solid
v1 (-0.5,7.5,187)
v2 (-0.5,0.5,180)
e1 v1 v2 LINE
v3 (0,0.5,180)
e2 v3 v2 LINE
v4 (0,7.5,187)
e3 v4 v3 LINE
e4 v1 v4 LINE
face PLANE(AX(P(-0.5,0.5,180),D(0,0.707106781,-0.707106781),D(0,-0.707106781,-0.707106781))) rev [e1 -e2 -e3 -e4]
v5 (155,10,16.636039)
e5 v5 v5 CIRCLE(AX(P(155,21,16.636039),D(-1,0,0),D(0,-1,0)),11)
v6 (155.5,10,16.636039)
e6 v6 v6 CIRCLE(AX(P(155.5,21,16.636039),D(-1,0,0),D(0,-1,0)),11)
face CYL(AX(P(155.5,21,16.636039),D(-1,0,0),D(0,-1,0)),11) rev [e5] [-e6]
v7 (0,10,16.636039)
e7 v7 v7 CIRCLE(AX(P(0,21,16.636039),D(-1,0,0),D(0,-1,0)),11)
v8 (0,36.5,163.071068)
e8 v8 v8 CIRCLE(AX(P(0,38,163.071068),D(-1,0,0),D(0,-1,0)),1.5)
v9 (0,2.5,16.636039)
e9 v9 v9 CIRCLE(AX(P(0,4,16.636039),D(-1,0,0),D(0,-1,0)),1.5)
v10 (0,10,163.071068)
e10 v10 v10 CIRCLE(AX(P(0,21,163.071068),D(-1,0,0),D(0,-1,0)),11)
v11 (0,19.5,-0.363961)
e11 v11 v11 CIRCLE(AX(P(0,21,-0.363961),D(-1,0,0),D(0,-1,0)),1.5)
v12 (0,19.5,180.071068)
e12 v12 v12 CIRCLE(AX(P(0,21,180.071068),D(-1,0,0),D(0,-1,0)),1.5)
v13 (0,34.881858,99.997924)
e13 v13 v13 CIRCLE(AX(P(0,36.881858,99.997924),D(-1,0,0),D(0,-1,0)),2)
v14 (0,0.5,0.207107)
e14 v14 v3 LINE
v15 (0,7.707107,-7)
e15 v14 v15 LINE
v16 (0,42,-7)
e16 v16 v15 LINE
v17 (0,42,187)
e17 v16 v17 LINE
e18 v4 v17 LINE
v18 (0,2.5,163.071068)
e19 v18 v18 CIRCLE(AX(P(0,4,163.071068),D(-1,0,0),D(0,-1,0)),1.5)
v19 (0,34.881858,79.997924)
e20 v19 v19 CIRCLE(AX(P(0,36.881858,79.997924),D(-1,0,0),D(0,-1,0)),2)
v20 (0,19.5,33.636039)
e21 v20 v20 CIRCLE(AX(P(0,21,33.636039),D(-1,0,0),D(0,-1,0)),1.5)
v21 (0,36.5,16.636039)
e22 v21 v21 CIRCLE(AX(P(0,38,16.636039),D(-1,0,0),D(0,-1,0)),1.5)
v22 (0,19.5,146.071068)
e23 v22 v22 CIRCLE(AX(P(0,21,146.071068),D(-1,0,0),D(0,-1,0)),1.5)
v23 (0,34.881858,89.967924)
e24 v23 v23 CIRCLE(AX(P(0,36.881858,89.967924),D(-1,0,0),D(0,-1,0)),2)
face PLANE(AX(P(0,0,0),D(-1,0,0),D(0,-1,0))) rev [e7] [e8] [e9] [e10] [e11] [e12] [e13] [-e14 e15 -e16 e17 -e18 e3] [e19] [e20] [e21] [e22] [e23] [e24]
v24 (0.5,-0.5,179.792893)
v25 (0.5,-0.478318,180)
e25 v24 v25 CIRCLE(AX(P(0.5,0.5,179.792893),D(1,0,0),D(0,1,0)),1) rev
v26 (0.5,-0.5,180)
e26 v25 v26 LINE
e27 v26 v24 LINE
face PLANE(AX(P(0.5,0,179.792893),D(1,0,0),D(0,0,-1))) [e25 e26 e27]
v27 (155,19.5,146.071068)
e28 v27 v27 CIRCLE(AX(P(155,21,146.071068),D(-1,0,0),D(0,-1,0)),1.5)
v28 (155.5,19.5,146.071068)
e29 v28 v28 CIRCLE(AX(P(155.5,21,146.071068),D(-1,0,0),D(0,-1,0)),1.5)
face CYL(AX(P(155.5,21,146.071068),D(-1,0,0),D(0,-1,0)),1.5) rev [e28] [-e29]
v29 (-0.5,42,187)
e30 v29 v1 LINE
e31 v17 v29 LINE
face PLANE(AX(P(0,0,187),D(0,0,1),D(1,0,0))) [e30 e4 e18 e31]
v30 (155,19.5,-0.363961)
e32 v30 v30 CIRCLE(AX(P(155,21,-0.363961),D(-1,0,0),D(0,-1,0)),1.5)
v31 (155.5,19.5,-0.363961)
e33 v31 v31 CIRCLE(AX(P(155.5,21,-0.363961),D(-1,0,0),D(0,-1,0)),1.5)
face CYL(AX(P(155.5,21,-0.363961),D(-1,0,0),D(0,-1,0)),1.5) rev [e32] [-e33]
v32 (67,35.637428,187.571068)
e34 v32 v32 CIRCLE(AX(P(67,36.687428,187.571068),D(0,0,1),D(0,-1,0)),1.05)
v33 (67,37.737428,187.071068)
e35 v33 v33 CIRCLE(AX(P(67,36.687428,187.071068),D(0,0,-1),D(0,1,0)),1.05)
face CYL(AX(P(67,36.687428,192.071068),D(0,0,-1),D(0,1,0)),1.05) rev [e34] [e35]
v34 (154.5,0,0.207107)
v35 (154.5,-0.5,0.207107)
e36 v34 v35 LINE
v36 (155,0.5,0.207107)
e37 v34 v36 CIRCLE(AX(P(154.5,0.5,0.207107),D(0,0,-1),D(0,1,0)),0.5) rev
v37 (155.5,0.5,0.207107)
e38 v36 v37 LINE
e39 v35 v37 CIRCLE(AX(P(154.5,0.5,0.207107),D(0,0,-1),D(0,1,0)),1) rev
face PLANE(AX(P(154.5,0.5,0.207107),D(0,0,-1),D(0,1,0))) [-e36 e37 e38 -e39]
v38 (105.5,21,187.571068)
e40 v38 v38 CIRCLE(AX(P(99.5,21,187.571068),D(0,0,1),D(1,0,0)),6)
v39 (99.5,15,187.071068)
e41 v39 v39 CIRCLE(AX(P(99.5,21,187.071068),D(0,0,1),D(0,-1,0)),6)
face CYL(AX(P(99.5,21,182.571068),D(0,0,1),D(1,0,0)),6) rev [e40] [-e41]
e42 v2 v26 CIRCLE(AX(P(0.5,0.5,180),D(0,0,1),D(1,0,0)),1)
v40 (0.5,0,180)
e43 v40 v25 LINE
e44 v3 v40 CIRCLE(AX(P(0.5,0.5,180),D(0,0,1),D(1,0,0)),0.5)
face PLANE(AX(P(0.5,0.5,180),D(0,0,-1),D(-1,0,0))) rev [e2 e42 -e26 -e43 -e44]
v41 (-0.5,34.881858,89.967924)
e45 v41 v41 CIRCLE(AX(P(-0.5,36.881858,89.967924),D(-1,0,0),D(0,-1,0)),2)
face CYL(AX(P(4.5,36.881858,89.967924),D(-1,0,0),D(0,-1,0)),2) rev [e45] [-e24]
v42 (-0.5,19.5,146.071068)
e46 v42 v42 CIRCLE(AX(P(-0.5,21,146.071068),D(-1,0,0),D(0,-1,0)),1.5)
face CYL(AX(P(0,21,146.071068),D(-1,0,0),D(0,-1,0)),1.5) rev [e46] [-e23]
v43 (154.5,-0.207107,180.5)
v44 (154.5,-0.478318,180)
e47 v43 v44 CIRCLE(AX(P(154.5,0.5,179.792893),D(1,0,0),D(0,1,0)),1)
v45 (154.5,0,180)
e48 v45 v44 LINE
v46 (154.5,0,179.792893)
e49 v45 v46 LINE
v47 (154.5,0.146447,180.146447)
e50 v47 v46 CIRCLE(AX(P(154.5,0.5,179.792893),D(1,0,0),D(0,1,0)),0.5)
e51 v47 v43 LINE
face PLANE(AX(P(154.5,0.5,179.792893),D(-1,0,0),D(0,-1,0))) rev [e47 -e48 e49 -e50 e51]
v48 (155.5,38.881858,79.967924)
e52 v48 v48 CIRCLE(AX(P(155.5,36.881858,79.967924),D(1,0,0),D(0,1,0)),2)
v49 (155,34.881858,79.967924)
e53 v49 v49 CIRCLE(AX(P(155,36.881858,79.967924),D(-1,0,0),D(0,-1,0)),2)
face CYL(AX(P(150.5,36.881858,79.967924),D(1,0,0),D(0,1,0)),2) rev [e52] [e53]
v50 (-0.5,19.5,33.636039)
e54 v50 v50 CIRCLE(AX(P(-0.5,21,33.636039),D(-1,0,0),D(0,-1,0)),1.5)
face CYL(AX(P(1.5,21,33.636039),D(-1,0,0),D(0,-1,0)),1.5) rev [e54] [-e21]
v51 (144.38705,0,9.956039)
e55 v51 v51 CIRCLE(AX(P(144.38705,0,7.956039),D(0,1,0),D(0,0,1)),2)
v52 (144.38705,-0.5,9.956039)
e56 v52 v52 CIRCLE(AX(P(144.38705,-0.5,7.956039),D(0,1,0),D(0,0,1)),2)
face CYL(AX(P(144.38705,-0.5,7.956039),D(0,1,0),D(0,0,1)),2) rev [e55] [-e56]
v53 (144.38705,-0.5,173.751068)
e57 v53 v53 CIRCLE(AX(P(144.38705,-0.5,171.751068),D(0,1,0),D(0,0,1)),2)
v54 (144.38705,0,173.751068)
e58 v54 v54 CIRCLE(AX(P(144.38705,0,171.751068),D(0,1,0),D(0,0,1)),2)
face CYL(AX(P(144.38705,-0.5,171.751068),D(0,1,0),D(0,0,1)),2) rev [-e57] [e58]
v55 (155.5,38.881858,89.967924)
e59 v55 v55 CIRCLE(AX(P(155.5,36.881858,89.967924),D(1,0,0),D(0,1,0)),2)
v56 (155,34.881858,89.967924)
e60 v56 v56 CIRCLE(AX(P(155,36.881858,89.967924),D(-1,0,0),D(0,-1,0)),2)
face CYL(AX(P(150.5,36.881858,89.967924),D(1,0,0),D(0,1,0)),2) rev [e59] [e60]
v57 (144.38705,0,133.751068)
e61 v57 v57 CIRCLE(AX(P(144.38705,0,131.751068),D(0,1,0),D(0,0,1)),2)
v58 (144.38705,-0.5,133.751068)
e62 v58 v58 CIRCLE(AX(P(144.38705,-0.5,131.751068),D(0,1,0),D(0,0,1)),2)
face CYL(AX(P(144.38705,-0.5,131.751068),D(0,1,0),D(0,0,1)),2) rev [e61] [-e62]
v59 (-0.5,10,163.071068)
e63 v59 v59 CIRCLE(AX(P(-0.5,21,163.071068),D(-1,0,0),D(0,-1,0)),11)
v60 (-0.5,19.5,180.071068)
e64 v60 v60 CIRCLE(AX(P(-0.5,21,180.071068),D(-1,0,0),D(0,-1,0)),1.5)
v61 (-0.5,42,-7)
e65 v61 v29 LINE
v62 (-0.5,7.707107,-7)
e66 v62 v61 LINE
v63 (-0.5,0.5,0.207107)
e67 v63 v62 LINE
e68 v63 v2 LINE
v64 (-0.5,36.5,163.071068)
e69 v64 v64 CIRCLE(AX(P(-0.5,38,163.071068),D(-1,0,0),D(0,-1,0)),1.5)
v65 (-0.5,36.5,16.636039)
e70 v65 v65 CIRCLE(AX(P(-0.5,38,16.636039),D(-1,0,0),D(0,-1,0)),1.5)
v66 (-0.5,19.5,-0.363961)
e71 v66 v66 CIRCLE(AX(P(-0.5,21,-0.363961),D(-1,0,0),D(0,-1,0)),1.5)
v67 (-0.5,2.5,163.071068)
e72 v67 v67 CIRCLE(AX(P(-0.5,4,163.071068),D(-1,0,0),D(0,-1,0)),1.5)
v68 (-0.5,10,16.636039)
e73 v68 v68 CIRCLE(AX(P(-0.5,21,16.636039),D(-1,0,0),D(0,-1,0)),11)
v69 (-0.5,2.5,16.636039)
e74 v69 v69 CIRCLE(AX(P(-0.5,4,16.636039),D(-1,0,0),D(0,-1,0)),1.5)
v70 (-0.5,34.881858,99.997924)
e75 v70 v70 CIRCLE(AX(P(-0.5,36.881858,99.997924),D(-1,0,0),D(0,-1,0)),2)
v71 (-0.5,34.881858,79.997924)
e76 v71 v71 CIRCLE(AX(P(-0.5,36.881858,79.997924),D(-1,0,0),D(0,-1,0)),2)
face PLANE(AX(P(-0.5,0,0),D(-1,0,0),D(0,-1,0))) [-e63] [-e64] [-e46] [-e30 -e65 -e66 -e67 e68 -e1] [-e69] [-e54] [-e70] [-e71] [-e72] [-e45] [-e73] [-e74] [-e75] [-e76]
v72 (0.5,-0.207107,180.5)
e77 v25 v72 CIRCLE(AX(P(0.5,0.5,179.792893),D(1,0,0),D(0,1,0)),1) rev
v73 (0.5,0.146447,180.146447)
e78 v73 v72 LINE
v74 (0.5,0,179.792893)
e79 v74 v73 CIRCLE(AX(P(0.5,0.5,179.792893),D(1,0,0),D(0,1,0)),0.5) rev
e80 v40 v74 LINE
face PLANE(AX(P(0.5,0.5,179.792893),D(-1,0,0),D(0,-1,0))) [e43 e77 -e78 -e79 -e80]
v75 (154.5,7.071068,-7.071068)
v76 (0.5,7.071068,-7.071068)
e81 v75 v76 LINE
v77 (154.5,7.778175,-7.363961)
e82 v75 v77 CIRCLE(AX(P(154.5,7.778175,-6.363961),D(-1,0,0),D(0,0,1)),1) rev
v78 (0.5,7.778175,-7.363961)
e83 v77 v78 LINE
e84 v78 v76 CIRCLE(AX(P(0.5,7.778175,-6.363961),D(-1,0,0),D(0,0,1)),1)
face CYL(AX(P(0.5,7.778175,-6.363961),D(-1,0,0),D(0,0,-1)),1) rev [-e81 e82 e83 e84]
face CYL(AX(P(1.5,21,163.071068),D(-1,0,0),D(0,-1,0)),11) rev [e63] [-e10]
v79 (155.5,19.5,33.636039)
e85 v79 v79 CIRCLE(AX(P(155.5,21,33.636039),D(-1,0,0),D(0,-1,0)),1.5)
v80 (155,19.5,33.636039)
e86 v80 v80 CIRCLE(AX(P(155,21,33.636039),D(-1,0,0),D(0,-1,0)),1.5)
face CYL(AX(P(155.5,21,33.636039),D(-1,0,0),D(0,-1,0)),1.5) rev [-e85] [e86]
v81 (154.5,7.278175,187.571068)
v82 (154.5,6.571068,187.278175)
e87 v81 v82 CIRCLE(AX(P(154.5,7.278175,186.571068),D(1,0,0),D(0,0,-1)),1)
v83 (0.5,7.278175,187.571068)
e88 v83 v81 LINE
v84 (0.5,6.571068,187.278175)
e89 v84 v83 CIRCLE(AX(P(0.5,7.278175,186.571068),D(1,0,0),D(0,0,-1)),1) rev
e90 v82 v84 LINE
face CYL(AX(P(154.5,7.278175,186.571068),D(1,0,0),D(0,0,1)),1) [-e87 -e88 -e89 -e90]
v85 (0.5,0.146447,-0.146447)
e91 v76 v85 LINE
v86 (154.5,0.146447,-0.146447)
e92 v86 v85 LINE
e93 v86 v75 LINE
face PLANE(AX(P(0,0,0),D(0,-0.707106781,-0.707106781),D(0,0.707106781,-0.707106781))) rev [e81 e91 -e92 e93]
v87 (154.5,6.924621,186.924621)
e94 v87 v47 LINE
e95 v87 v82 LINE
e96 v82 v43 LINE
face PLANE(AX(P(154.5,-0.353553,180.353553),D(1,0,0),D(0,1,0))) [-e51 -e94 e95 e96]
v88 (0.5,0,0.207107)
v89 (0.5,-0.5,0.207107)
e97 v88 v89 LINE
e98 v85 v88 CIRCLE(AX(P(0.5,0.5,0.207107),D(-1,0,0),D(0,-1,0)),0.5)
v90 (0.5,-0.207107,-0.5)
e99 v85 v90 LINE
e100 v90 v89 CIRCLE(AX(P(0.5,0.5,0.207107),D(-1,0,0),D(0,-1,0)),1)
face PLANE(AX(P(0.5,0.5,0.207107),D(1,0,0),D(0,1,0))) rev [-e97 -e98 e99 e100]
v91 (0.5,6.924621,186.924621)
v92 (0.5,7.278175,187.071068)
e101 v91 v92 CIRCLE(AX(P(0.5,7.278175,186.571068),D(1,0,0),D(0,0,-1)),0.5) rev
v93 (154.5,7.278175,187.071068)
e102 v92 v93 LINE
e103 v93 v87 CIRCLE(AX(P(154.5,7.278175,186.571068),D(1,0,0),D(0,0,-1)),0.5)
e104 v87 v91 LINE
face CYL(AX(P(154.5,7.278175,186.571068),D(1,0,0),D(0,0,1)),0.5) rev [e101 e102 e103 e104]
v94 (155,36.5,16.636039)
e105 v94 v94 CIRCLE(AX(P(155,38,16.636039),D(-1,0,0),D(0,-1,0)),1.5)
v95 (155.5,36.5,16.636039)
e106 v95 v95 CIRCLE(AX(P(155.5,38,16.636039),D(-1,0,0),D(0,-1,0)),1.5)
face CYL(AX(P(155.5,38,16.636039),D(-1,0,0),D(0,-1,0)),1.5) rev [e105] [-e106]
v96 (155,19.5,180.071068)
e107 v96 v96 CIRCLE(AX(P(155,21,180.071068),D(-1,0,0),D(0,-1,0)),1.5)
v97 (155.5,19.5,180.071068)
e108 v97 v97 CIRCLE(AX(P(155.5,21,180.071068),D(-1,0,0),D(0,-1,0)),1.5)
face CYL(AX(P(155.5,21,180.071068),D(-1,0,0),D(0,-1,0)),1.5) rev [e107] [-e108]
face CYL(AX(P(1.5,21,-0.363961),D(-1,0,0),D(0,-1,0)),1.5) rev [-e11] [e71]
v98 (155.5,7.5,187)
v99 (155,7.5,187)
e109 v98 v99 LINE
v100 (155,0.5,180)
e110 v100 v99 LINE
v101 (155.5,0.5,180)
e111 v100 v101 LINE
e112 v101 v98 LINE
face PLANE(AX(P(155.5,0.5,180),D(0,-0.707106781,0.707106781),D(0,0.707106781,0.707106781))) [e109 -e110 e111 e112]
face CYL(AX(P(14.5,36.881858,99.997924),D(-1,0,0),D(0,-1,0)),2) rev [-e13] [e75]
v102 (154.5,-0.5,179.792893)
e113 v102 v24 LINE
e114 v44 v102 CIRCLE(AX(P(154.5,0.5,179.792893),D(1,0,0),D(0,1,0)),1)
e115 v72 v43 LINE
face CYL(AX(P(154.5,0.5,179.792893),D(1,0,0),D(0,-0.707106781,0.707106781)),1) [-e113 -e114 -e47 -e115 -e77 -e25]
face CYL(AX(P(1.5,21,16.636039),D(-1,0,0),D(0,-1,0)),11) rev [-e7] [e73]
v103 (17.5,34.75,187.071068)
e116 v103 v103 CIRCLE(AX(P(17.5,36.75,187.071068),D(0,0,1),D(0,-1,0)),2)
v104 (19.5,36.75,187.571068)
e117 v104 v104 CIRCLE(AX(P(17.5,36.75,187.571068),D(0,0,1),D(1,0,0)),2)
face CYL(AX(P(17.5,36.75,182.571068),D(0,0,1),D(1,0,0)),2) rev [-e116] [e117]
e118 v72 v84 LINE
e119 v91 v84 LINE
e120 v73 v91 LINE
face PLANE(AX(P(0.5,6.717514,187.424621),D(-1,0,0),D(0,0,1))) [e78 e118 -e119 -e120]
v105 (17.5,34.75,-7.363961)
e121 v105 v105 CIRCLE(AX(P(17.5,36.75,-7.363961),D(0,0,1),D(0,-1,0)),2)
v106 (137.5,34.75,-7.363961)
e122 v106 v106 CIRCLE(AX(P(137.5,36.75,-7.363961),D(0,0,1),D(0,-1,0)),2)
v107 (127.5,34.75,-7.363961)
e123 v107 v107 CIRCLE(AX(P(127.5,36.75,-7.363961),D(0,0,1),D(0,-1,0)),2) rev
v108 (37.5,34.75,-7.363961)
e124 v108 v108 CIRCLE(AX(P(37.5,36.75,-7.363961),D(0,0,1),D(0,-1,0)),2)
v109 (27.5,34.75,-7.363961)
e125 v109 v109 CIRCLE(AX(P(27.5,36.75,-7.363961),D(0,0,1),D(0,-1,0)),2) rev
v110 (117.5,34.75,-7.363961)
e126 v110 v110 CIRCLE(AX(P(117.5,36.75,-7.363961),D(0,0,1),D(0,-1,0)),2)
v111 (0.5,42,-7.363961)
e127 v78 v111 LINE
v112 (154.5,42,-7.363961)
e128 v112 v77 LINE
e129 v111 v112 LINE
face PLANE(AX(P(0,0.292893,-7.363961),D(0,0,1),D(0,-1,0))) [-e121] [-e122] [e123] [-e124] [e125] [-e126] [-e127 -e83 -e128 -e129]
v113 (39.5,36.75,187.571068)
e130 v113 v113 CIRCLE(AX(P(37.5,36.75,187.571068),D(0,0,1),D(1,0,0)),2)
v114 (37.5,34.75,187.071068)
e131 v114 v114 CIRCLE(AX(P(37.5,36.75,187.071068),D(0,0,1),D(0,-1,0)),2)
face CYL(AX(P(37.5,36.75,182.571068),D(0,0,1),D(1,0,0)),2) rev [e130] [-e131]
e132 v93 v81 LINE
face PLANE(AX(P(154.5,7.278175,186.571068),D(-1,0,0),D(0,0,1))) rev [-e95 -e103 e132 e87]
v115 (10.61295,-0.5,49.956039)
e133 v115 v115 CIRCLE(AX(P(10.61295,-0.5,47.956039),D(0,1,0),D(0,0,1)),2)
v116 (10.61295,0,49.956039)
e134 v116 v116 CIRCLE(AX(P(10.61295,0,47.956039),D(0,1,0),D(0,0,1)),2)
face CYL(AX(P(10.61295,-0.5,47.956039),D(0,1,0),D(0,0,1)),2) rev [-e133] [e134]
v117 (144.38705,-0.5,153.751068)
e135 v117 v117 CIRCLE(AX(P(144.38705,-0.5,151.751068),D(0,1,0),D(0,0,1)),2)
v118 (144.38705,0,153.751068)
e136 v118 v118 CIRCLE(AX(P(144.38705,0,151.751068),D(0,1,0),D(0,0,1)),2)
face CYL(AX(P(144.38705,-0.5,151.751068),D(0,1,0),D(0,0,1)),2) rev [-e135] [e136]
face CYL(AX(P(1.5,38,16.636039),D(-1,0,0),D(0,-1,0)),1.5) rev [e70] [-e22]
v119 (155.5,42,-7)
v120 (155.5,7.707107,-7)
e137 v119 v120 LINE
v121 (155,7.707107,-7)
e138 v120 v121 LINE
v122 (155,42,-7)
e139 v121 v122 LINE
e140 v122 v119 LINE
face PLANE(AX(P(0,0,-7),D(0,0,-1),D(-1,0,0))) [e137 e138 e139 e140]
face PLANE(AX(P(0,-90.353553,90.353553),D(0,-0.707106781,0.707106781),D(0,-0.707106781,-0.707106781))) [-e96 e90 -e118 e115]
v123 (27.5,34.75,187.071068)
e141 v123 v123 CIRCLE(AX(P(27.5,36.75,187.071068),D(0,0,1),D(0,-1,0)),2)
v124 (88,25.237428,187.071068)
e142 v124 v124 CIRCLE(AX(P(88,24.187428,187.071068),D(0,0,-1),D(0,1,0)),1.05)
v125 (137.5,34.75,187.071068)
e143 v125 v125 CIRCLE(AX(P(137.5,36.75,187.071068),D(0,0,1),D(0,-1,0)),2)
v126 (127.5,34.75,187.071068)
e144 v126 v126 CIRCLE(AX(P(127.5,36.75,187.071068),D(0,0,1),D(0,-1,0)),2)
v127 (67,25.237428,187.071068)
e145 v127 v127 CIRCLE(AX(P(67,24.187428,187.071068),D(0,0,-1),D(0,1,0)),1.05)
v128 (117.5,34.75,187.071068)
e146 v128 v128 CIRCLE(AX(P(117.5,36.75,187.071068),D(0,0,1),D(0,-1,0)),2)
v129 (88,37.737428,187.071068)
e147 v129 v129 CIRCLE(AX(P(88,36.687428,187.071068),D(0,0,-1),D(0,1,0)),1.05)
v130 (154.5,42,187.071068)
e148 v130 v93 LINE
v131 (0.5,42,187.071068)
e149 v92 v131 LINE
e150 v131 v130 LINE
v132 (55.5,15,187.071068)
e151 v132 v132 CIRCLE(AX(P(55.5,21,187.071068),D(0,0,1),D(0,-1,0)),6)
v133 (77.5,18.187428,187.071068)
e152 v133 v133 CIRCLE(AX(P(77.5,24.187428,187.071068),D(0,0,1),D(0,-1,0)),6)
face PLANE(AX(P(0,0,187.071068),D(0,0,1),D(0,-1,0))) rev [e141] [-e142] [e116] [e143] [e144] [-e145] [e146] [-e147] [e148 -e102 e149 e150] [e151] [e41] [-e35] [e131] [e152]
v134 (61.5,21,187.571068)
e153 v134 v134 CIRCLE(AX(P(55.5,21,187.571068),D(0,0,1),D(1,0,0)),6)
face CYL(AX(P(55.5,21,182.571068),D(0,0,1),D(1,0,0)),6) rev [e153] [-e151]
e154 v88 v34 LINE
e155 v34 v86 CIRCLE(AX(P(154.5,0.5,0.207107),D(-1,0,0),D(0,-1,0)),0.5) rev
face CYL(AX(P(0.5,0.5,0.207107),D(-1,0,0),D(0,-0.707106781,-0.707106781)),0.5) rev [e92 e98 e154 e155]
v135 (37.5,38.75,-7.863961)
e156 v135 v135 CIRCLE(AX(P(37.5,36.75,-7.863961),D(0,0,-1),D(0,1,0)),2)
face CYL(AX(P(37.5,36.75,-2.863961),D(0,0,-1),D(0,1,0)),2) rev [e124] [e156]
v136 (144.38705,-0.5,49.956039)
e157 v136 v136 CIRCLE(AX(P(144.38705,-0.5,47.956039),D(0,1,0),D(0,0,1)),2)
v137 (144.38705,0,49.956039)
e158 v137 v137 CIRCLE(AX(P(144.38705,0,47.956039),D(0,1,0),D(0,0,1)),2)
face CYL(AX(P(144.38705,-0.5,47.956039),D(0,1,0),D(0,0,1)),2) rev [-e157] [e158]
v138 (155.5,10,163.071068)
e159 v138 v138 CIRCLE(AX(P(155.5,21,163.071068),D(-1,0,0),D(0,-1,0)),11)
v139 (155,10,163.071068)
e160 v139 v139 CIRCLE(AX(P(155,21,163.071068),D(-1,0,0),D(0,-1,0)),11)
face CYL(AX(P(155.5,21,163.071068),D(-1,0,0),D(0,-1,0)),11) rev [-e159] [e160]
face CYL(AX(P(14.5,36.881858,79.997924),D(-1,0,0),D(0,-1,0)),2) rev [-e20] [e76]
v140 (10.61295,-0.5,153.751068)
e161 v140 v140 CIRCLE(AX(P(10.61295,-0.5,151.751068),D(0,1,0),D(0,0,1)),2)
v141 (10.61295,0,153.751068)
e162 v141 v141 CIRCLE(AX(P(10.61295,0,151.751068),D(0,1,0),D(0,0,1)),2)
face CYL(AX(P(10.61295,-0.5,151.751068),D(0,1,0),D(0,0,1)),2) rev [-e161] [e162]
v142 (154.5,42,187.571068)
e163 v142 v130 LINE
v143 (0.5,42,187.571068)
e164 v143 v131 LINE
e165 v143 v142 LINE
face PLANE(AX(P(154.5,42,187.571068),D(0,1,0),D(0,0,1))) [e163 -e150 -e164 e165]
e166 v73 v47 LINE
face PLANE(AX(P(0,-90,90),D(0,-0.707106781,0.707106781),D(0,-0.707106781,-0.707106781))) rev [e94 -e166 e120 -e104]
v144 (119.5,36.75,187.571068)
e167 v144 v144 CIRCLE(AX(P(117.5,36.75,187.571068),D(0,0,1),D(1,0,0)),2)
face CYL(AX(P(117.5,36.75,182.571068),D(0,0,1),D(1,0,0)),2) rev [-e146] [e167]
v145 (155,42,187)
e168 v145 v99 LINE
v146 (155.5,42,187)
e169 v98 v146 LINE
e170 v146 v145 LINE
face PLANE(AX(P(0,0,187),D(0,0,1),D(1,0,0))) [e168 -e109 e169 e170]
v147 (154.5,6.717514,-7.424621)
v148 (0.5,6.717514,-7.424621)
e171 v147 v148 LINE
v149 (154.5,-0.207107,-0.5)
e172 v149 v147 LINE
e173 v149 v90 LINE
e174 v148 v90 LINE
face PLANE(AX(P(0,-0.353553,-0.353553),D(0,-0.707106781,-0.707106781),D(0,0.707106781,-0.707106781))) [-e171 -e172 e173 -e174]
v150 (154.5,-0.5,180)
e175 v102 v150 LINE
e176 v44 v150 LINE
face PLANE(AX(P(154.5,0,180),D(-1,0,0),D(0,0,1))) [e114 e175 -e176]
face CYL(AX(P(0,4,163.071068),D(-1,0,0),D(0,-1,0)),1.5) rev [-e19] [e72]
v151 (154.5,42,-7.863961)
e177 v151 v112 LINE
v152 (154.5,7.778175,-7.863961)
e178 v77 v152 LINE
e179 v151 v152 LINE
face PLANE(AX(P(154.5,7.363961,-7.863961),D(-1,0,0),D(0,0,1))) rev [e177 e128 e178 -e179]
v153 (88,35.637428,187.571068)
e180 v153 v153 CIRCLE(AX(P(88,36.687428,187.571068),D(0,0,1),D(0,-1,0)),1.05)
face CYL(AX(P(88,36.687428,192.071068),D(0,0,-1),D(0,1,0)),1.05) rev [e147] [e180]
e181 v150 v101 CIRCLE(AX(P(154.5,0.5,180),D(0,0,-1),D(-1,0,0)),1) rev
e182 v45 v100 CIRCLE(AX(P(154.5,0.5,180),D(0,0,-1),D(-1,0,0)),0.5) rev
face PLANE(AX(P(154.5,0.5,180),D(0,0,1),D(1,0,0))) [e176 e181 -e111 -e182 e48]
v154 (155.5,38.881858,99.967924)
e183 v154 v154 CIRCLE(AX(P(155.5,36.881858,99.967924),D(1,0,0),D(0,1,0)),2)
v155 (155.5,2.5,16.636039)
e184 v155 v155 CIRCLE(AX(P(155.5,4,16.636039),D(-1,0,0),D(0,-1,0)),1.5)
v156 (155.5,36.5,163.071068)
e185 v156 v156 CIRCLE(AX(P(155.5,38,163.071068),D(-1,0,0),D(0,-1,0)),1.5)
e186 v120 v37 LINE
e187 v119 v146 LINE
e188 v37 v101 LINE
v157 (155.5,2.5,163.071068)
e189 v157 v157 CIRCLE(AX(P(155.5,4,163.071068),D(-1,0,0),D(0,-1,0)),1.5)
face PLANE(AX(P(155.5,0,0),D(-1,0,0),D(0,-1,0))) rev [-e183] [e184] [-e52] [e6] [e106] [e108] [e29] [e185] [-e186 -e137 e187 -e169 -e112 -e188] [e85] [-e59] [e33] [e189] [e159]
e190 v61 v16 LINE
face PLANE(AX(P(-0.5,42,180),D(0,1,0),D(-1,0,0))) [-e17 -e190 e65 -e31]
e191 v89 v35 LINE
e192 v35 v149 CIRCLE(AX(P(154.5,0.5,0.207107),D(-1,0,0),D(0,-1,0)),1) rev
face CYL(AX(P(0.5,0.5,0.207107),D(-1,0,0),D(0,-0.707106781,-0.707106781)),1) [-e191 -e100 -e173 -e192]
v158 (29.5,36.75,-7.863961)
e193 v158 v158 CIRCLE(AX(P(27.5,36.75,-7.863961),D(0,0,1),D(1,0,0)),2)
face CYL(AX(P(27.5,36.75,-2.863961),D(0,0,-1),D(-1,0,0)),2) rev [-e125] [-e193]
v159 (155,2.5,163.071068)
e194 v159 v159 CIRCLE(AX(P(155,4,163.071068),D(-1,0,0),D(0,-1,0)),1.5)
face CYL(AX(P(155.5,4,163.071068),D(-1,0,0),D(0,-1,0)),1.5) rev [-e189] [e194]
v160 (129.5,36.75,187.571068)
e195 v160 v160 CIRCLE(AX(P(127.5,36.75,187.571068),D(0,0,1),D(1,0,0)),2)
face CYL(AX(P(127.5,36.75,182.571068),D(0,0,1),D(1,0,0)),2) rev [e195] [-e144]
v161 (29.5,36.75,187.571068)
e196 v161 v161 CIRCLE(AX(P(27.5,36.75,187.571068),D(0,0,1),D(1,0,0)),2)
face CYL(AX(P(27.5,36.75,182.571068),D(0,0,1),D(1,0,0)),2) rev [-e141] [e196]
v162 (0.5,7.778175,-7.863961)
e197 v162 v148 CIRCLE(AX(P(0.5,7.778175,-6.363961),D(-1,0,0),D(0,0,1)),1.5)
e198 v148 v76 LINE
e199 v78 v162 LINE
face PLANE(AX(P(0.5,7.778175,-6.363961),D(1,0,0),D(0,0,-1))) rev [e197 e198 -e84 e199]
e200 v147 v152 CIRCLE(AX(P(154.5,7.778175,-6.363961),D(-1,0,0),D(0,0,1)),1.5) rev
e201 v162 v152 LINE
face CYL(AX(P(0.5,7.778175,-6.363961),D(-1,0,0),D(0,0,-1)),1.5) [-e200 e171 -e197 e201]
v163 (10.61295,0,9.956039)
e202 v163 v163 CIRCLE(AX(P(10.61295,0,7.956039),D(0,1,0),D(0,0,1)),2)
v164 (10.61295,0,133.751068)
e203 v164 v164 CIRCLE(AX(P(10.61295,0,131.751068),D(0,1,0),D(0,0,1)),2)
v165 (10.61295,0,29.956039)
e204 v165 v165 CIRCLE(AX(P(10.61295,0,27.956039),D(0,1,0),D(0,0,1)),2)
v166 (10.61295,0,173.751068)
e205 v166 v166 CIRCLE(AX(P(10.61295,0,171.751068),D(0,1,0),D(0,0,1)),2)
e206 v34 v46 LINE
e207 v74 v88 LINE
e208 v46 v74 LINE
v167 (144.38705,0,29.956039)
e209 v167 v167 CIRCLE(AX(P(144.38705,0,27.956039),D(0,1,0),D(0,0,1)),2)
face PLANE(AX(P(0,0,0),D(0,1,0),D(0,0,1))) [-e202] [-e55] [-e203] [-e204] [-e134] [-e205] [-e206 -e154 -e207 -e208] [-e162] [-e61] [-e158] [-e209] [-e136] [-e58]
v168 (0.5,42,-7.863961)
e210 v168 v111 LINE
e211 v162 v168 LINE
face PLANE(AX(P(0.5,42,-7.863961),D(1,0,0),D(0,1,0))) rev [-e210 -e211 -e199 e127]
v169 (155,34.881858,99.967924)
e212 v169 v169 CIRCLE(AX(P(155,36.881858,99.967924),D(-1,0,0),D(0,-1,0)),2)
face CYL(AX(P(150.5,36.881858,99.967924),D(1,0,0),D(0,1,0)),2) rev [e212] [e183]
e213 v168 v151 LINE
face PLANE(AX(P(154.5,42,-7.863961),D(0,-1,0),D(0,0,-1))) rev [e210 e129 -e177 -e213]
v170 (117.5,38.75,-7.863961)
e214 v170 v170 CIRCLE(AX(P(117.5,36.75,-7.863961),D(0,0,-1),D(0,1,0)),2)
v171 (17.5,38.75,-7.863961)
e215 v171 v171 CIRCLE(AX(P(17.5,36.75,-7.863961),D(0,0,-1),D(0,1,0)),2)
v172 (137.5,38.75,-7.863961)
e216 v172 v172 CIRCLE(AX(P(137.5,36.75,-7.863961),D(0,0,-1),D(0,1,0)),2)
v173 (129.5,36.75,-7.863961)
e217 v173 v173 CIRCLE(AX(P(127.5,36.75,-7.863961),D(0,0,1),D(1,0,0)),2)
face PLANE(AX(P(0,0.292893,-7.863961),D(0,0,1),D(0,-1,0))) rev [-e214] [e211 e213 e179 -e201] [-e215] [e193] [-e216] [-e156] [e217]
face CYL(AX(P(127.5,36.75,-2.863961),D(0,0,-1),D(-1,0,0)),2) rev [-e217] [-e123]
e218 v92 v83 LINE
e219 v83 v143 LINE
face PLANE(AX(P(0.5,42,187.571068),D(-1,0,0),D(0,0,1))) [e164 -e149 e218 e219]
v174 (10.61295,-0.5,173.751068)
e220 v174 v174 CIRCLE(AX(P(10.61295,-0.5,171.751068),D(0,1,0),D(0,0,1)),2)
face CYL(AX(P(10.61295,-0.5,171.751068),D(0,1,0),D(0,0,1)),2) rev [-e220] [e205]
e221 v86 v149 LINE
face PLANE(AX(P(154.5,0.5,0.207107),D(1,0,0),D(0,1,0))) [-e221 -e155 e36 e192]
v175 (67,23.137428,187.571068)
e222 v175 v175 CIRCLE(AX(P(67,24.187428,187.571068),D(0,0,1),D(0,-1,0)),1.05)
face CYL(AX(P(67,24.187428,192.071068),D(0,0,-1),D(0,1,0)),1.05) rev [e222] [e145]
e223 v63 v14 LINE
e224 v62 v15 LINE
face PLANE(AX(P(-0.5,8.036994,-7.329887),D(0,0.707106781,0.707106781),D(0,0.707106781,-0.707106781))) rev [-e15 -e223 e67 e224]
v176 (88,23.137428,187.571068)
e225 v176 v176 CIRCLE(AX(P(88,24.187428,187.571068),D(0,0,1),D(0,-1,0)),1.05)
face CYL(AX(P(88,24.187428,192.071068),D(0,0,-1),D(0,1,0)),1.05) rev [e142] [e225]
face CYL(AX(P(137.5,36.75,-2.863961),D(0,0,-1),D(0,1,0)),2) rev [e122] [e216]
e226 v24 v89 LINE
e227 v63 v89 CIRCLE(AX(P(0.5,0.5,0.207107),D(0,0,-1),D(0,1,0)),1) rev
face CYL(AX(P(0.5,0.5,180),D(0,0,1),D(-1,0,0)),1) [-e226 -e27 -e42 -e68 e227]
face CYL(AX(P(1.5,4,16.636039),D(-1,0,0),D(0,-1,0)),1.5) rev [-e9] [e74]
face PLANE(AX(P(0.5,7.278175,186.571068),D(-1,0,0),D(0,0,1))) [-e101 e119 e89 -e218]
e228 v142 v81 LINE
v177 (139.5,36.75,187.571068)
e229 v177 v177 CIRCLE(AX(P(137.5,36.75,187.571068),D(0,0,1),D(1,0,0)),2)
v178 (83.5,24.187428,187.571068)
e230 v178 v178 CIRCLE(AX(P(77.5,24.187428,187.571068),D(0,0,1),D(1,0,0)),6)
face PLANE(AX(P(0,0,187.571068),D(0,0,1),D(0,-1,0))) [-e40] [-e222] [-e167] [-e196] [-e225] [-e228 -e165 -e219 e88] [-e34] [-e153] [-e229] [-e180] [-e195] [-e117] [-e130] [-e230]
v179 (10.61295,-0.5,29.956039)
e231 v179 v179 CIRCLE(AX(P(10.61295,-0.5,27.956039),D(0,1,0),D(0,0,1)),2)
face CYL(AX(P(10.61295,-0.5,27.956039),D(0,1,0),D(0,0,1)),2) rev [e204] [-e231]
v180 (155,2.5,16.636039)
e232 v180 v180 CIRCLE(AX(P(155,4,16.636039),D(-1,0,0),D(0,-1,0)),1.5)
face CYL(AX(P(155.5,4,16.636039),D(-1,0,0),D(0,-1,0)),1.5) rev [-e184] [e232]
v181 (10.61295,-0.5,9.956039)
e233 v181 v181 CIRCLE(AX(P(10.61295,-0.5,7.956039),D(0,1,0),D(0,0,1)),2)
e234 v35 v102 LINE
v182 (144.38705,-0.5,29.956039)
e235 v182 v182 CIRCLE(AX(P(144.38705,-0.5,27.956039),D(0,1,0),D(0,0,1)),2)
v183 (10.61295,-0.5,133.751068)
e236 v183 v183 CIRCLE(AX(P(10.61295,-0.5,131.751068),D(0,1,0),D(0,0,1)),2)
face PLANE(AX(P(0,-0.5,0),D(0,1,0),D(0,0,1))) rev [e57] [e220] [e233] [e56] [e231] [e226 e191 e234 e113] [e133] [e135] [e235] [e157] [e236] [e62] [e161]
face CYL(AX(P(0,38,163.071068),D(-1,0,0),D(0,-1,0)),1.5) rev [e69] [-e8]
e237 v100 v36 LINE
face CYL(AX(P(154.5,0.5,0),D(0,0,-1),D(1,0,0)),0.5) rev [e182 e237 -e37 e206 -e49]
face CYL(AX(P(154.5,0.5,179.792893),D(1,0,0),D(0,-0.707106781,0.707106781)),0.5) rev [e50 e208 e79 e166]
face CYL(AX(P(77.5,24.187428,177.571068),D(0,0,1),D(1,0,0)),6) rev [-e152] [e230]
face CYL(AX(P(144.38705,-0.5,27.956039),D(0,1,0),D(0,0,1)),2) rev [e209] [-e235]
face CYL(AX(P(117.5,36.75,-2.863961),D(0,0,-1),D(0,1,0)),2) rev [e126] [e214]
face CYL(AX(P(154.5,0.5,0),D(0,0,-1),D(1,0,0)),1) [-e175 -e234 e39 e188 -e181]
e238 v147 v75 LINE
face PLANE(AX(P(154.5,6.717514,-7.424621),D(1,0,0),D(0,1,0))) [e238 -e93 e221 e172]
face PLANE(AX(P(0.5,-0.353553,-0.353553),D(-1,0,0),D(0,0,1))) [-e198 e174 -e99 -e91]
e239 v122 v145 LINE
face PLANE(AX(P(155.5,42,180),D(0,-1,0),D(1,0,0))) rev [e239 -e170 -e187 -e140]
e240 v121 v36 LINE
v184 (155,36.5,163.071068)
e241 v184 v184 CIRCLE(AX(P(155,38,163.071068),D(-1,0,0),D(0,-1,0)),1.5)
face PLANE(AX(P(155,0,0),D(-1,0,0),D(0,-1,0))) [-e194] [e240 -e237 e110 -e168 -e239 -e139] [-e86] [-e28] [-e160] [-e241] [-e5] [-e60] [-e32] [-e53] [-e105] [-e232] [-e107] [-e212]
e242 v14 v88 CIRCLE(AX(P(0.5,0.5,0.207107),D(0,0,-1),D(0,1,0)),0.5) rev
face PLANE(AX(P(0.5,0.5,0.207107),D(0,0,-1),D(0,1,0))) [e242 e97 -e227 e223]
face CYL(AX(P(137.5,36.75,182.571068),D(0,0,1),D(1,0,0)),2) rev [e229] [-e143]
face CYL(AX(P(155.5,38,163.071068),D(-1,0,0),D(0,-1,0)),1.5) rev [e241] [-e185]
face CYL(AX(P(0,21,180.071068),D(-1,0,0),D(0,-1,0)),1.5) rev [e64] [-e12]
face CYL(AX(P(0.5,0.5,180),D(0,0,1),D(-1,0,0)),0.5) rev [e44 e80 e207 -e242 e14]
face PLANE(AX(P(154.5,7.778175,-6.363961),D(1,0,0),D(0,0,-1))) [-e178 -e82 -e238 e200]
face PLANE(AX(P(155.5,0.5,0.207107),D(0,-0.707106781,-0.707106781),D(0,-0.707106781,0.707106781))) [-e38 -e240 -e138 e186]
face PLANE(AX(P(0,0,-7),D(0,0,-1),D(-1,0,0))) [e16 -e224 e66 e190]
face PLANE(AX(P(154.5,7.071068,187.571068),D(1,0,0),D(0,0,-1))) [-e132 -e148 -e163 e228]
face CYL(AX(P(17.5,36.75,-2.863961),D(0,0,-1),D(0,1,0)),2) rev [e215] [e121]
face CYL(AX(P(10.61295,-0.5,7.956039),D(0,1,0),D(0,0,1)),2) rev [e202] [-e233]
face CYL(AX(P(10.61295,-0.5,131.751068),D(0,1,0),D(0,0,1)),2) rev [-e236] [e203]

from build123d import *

# Parameters (mm, degrees)
SKETCH1_W                    = 155
SKETCH1_H                    = 180
BASE_FLANGE1_DEPTH           = 0.5
EDGE_FLANGE1_STRIP_W         = 3
EDGE_FLANGE1_STRIP_H         = 0.5
EDGE_FLANGE1_STRIP_CUT_DEPTH = 180
EDGE_FLANGE1_DEPTH           = 180
EDGE_FLANGE9_STRIP_W         = 3
EDGE_FLANGE9_STRIP_H         = 0.5
EDGE_FLANGE9_STRIP_CUT_DEPTH = 180
EDGE_FLANGE9_DEPTH           = 180
EDGE_FLANGE3_START           = -0.5
EDGE_FLANGE3_DEPTH           = 156
EDGE_FLANGE3_2_DEPTH         = 1
EDGE_FLANGE3_START_2         = 154.5
EDGE_FLANGE3_3_DEPTH         = 1
EDGE_FLANGE3_START_3         = 0.5
EDGE_FLANGE3_4_DEPTH         = 154
EDGE_FLANGE4_DEPTH           = 154
SKETCH25_W                   = 0.5
SKETCH25_H                   = 41.5
BOSS_EXTRUDE1_DEPTH          = 7
CUT_EXTRUDE2_DEPTH           = 0.5
EDGE_FLANGE5_STRIP_CUT_DEPTH = 154
EDGE_FLANGE5_DEPTH           = 154
EDGE_FLANGE6_STRIP_CUT_DEPTH = 154
EDGE_FLANGE6_DEPTH           = 154
SKETCH41_W                   = 0.5
SKETCH41_H                   = 41.5
BOSS_EXTRUDE2_DEPTH          = 7
CUT_EXTRUDE3_DEPTH           = 0.5
SKETCH45_R                   = 11
CUT_EXTRUDE6_DEPTH           = 2
SKETCH51_R                   = 1.5
CUT_EXTRUDE7_DEPTH           = 2
SKETCH61_W                   = 0.5
SKETCH61_H                   = 41.5
BOSS_EXTRUDE3_DEPTH          = 7
SKETCH62_W                   = 0.5
SKETCH62_H                   = 41.5
BOSS_EXTRUDE4_DEPTH          = 7
CUT_EXTRUDE8_DEPTH           = 0.5
CUT_EXTRUDE9_DEPTH           = 0.5
SKETCH65_R                   = 11
CUT_EXTRUDE10_DEPTH          = 0.5
SKETCH66_R                   = 1.5
CUT_EXTRUDE11_DEPTH          = 0.5
SKETCH67_R                   = 11
CUT_EXTRUDE12_DEPTH          = 0.5
SKETCH68_R                   = 1.5
CUT_EXTRUDE13_DEPTH          = 0.5
SKETCH69_R                   = 1.5
CUT_EXTRUDE14_DEPTH          = 0.5
SKETCH70_R                   = 2
CUT_EXTRUDE15_DEPTH          = 248.239065441
SKETCH75_R                   = 6
CUT_EXTRUDE16_DEPTH          = 10
SKETCH76_R                   = 1.05
CUT_EXTRUDE17_DEPTH          = 5
SKETCH77_R                   = 2
CUT_EXTRUDE18_DEPTH          = 5
CUT_EXTRUDE23_START          = 5
SKETCH78_R                   = 2
CUT_EXTRUDE23_DEPTH          = 5
SKETCH79_R                   = 2
CUT_EXTRUDE24_DEPTH          = 5
CUT_EXTRUDE25_START          = -5
SKETCH80_R                   = 2
CUT_EXTRUDE25_DEPTH          = 5
SKETCH81_R                   = 2
CUT_EXTRUDE26_DEPTH          = 5
SKETCH83_R                   = 2
CUT_EXTRUDE28_DEPTH          = 15
SKETCH84_R                   = 2
CUT_EXTRUDE29_DEPTH          = 5
CUT_EXTRUDE30_START          = -5
SKETCH85_R                   = 2
CUT_EXTRUDE30_DEPTH          = 5
SKETCH88_R                   = 6
CUT_EXTRUDE31_DEPTH          = 5


# Read off the part's stored shape, not the designer's step: Edge-Flange3
# Sheet-metal steps are written as plain solids
with BuildPart() as part:
    # Sketch1 → Base-Flange1 (new body)
    with BuildSketch(Plane(origin=(0, 0, 0), x_dir=(1, 0, 0), z_dir=(0, 1, 0))):
        with Locations((77.5, -90)):
            Rectangle(SKETCH1_W, SKETCH1_H)
    extrude(amount=-BASE_FLANGE1_DEPTH)

    # Edge-Flange1 strip (across the edge) → Edge-Flange1 strip cut (cut)
    with BuildSketch(Plane.XY):
        with Locations((-1, -0.25)):
            Rectangle(EDGE_FLANGE1_STRIP_W, EDGE_FLANGE1_STRIP_H)
    extrude(amount=EDGE_FLANGE1_STRIP_CUT_DEPTH, mode=Mode.SUBTRACT)

    # Edge-Flange1 section (across the edge) → Edge-Flange1 (add)
    with BuildSketch(Plane.XY):
        with BuildLine():
            Line((-0.5, 0.5), (-0.5, 42))
            Line((-0.5, 42), (0, 42))
            Line((0, 42), (0, 0.5))
            ThreePointArc((0, 0.5), (0.146446609, 0.146446609), (0.5, 0))
            Line((0.5, 0), (0.5, -0.5))
            ThreePointArc((0.5, -0.5), (-0.207106781, -0.207106781), (-0.5, 0.5))
        make_face()
    extrude(amount=EDGE_FLANGE1_DEPTH)

    # Edge-Flange9 strip (across the edge) → Edge-Flange9 strip cut (cut)
    with BuildSketch(Plane(origin=(155, 0, 180), x_dir=(-1, 0, 0), z_dir=(0, 0, -1))):
        with Locations((-1, -0.25)):
            Rectangle(EDGE_FLANGE9_STRIP_W, EDGE_FLANGE9_STRIP_H)
    extrude(amount=EDGE_FLANGE9_STRIP_CUT_DEPTH, mode=Mode.SUBTRACT)

    # Edge-Flange9 section (across the edge) → Edge-Flange9 (add)
    with BuildSketch(Plane(origin=(155, 0, 180), x_dir=(-1, 0, 0), z_dir=(0, 0, -1))):
        with BuildLine():
            Line((-0.5, 0.5), (-0.5, 42))
            Line((-0.5, 42), (0, 42))
            Line((0, 42), (0, 0.5))
            ThreePointArc((0, 0.5), (0.146446609, 0.146446609), (0.5, 0))
            Line((0.5, 0), (0.5, -0.5))
            ThreePointArc((0.5, -0.5), (-0.207106781, -0.207106781), (-0.5, 0.5))
        make_face()
    extrude(amount=EDGE_FLANGE9_DEPTH)

    # Edge-Flange3 outline → Edge-Flange3 (cut)
    with BuildSketch(Plane.YZ.offset(EDGE_FLANGE3_START)):
        with BuildLine():
            Line((0.5, 0), (0.5, 0.207106781))
            Line((0.5, 0.207106781), (0, 0.207106781))
            ThreePointArc((0, 0.207106781), (0.011356505, 0.101146719), (0.04491014, 0))
            Line((0.04491014, 0), (0.5, 0))
        make_face()
        with BuildLine():
            ThreePointArc((-0.478318344, 0), (-0.494564815, 0.102987483), (-0.5, 0.207106781))
            Line((-0.5, 0.207106781), (-0.5, 0))
            Line((-0.5, 0), (-0.478318344, 0))
        make_face()
    extrude(amount=EDGE_FLANGE3_DEPTH, mode=Mode.SUBTRACT)

    # Edge-Flange3 2 outline → Edge-Flange3 2 (cut)
    with BuildSketch(Plane.YZ.offset(EDGE_FLANGE3_START)):
        with BuildLine():
            Line((-0.478318344, 0), (0.04491014, 0))
            ThreePointArc((0.04491014, 0), (0.011356505, 0.101146719), (0, 0.207106781))
            Line((0, 0.207106781), (-0.5, 0.207106781))
            ThreePointArc((-0.5, 0.207106781), (-0.494564815, 0.102987483), (-0.478318344, 0))
        make_face()
    extrude(amount=EDGE_FLANGE3_2_DEPTH, mode=Mode.SUBTRACT)

    # Edge-Flange3 3 outline → Edge-Flange3 3 (cut)
    with BuildSketch(Plane.YZ.offset(EDGE_FLANGE3_START_2)):
        with BuildLine():
            Line((-0.478318344, 0), (0.04491014, 0))
            ThreePointArc((0.04491014, 0), (0.011356505, 0.101146719), (0, 0.207106781))
            Line((0, 0.207106781), (-0.5, 0.207106781))
            ThreePointArc((-0.5, 0.207106781), (-0.494564815, 0.102987483), (-0.478318344, 0))
        make_face()
    extrude(amount=EDGE_FLANGE3_3_DEPTH, mode=Mode.SUBTRACT)

    # Edge-Flange3 4 outline → Edge-Flange3 4 (add)
    with BuildSketch(Plane.YZ.offset(EDGE_FLANGE3_START_3)):
        with BuildLine():
            Line((0, 0.207106781), (0, 0))
            Line((0, 0), (-0.478318344, 0))
            ThreePointArc((-0.478318344, 0), (-0.379013346, -0.269690385), (-0.207106781, -0.5))
            Line((-0.207106781, -0.5), (6.717514421, -7.424621202))
            Line((6.717514421, -7.424621202), (7.071067812, -7.071067812))
            Line((7.071067812, -7.071067812), (0.146446609, -0.146446609))
            ThreePointArc((0.146446609, -0.146446609), (0.038060234, 0.015765065), (0, 0.207106781))
        make_face()
    extrude(amount=EDGE_FLANGE3_4_DEPTH)

    # Edge-Flange4 section (across the edge) → Edge-Flange4 (add)
    with BuildSketch(Plane(origin=(154.5, 7.363961031, -7.363961031), x_dir=(0, 0, 1), z_dir=(-1, 0, 0))):
        with BuildLine():
            Line((-0.5, 0.414213562), (-0.5, 34.636038969))
            Line((-0.5, 34.636038969), (0, 34.636038969))
            Line((0, 34.636038969), (0, 0.414213562))
            ThreePointArc((0, 0.414213562), (0.076120467, 0.03153013), (0.292893219, -0.292893219))
            Line((0.292893219, -0.292893219), (-0.060660172, -0.646446609))
            ThreePointArc((-0.060660172, -0.646446609), (-0.385819299, -0.159811586), (-0.5, 0.414213562))
        make_face()
    extrude(amount=EDGE_FLANGE4_DEPTH)

    # Sketch25 → Boss-Extrude1 (add)
    with BuildSketch(Plane(origin=(0, 0, 0), x_dir=(-1, 0, 0), z_dir=(0, 0, -1))):
        with Locations((0.25, 21.25)):
            Rectangle(SKETCH25_W, SKETCH25_H)
    extrude(amount=BOSS_EXTRUDE1_DEPTH)

    # Sketch28 → Cut-Extrude2 (cut)
    with BuildSketch(Plane.ZY.offset(0.5)):
        Polygon((-7.329886857, 8.036993638), (0.207106781, 0.5), (-7.329886857, 0.5), align=None)
    extrude(amount=-CUT_EXTRUDE2_DEPTH, mode=Mode.SUBTRACT)

    # Edge-Flange5 strip (across the edge) → Edge-Flange5 strip cut (cut)
    with BuildSketch(Plane(origin=(0.5, 0, 180), x_dir=(0, 0.7071067811865512, -0.7071067811865438), z_dir=(1, 0, 0))):
        Polygon((-2.328427125, 1.621320344), (-0.207106781, -0.5), (0.146446609, -0.146446609), (-1.974873734, 1.974873734), align=None)
    extrude(amount=EDGE_FLANGE5_STRIP_CUT_DEPTH, mode=Mode.SUBTRACT)

    # Edge-Flange5 section (across the edge) → Edge-Flange5 (add)
    with BuildSketch(Plane(origin=(0.5, 0, 180), x_dir=(0, 0.7071067811865512, -0.7071067811865438), z_dir=(1, 0, 0))):
        with BuildLine():
            Line((-0.5, 0.207106781), (-0.5, 10))
            Line((-0.5, 10), (0, 10))
            Line((0, 10), (0, 0.207106781))
            ThreePointArc((0, 0.207106781), (0.038060234, 0.015765065), (0.146446609, -0.146446609))
            Line((0.146446609, -0.146446609), (-0.207106781, -0.5))
            ThreePointArc((-0.207106781, -0.5), (-0.423879533, -0.175576651), (-0.5, 0.207106781))
        make_face()
    extrude(amount=EDGE_FLANGE5_DEPTH)

    # Edge-Flange6 strip (across the edge) → Edge-Flange6 strip cut (cut)
    with BuildSketch(Plane(origin=(0.5, 7.071067812, 187.071067812), x_dir=(0, 0, -1), z_dir=(1, 0, 0))):
        Polygon((-2.328427125, 1.621320344), (-0.207106781, -0.5), (0.146446609, -0.146446609), (-1.974873734, 1.974873734), align=None)
    extrude(amount=EDGE_FLANGE6_STRIP_CUT_DEPTH, mode=Mode.SUBTRACT)

    # Edge-Flange6 section (across the edge) → Edge-Flange6 (add)
    with BuildSketch(Plane(origin=(0.5, 7.071067812, 187.071067812), x_dir=(0, 0, -1), z_dir=(1, 0, 0))):
        with BuildLine():
            Line((-0.5, 0.207106781), (-0.5, 34.928932188))
            Line((-0.5, 34.928932188), (0, 34.928932188))
            Line((0, 34.928932188), (0, 0.207106781))
            ThreePointArc((0, 0.207106781), (0.038060234, 0.015765065), (0.146446609, -0.146446609))
            Line((0.146446609, -0.146446609), (-0.207106781, -0.5))
            ThreePointArc((-0.207106781, -0.5), (-0.423879533, -0.175576651), (-0.5, 0.207106781))
        make_face()
    extrude(amount=EDGE_FLANGE6_DEPTH)

    # Sketch41 → Boss-Extrude2 (add)
    with BuildSketch(Plane.XY.offset(180)):
        with Locations((-0.25, 21.25)):
            Rectangle(SKETCH41_W, SKETCH41_H)
    extrude(amount=BOSS_EXTRUDE2_DEPTH)

    # Sketch44 → Cut-Extrude3 (cut)
    with BuildSketch(Plane.ZY.offset(0.5)):
        Polygon((180, 0.5), (187, 7.5), (187, 0.5), align=None)
    extrude(amount=-CUT_EXTRUDE3_DEPTH, mode=Mode.SUBTRACT)

    # Sketch45 → Cut-Extrude6 (cut)
    with BuildSketch(Plane.ZY.offset(0.5)):
        with Locations(Location((16.636038969, 21, 0), (0, 0, 270))):
            Circle(SKETCH45_R)
        with Locations(Location((163.071067812, 21, 0), (0, 0, 270))):
            Circle(SKETCH45_R)
    extrude(amount=-CUT_EXTRUDE6_DEPTH, mode=Mode.SUBTRACT)

    # Sketch51 → Cut-Extrude7 (cut)
    with BuildSketch(Plane.ZY.offset(0.5)):
        with Locations(Location((16.636038969, 38, 0), (0, 0, 270))):
            Circle(SKETCH51_R)
        with Locations(Location((33.636038969, 21, 0), (0, 0, 270))):
            Circle(SKETCH51_R)
        with Locations(Location((16.636038969, 4, 0), (0, 0, 270))):
            Circle(SKETCH51_R)
        with Locations(Location((-0.363961031, 21, 0), (0, 0, 270))):
            Circle(SKETCH51_R)
    extrude(amount=-CUT_EXTRUDE7_DEPTH, mode=Mode.SUBTRACT)

    # Sketch61 → Boss-Extrude3 (add)
    with BuildSketch(Plane(origin=(0, 0, 0), x_dir=(-1, 0, 0), z_dir=(0, 0, -1))):
        with Locations((-155.25, 21.25)):
            Rectangle(SKETCH61_W, SKETCH61_H)
    extrude(amount=BOSS_EXTRUDE3_DEPTH)

    # Sketch62 → Boss-Extrude4 (add)
    with BuildSketch(Plane.XY.offset(180)):
        with Locations((155.25, 21.25)):
            Rectangle(SKETCH62_W, SKETCH62_H)
    extrude(amount=BOSS_EXTRUDE4_DEPTH)

    # Sketch63 → Cut-Extrude8 (cut)
    with BuildSketch(Plane(origin=(155.5, 0, 0), x_dir=(0, 0, -1), z_dir=(1, 0, 0))):
        Polygon((-0.207106781, 0.5), (7, 7.707106781), (7, 0.5), align=None)
    extrude(amount=-CUT_EXTRUDE8_DEPTH, mode=Mode.SUBTRACT)

    # Sketch64 → Cut-Extrude9 (cut)
    with BuildSketch(Plane(origin=(155.5, 0, 0), x_dir=(0, 0, -1), z_dir=(1, 0, 0))):
        Polygon((-180, 0.5), (-187, 7.5), (-187, 0.5), align=None)
    extrude(amount=-CUT_EXTRUDE9_DEPTH, mode=Mode.SUBTRACT)

    # Sketch65 → Cut-Extrude10 (cut)
    with BuildSketch(Plane.ZY.offset(-155)):
        with Locations(Location((16.636038969, 21, 0), (0, 0, 270))):
            Circle(SKETCH65_R)
    extrude(amount=-CUT_EXTRUDE10_DEPTH, mode=Mode.SUBTRACT)

    # Sketch66 → Cut-Extrude11 (cut)
    with BuildSketch(Plane.ZY.offset(-155)):
        with Locations(Location((16.636038969, 38, 0), (0, 0, 270))):
            Circle(SKETCH66_R)
        with Locations(Location((33.636038969, 21, 0), (0, 0, 270))):
            Circle(SKETCH66_R)
        with Locations(Location((16.636038969, 4, 0), (0, 0, 270))):
            Circle(SKETCH66_R)
        with Locations(Location((-0.363961031, 21, 0), (0, 0, 270))):
            Circle(SKETCH66_R)
    extrude(amount=-CUT_EXTRUDE11_DEPTH, mode=Mode.SUBTRACT)

    # Sketch67 → Cut-Extrude12 (cut)
    with BuildSketch(Plane.ZY.offset(-155)):
        with Locations(Location((163.071067812, 21, 0), (0, 0, 270))):
            Circle(SKETCH67_R)
    extrude(amount=-CUT_EXTRUDE12_DEPTH, mode=Mode.SUBTRACT)

    # Sketch68 → Cut-Extrude13 (cut)
    with BuildSketch(Plane.ZY.offset(0.5)):
        with Locations(Location((163.071067812, 38, 0), (0, 0, 270))):
            Circle(SKETCH68_R)
        with Locations(Location((180.071067812, 21, 0), (0, 0, 270))):
            Circle(SKETCH68_R)
        with Locations(Location((163.071067812, 4, 0), (0, 0, 270))):
            Circle(SKETCH68_R)
        with Locations(Location((146.071067812, 21, 0), (0, 0, 270))):
            Circle(SKETCH68_R)
    extrude(amount=-CUT_EXTRUDE13_DEPTH, mode=Mode.SUBTRACT)

    # Sketch69 → Cut-Extrude14 (cut)
    with BuildSketch(Plane.ZY.offset(-155)):
        with Locations(Location((163.071067812, 38, 0), (0, 0, 270))):
            Circle(SKETCH69_R)
        with Locations(Location((180.071067812, 21, 0), (0, 0, 270))):
            Circle(SKETCH69_R)
        with Locations(Location((163.071067812, 4, 0), (0, 0, 270))):
            Circle(SKETCH69_R)
        with Locations(Location((146.071067812, 21, 0), (0, 0, 270))):
            Circle(SKETCH69_R)
    extrude(amount=-CUT_EXTRUDE14_DEPTH, mode=Mode.SUBTRACT)

    # Sketch70 → Cut-Extrude15 (cut, through all)
    with BuildSketch(Plane(origin=(0, 0, 0), x_dir=(1, 0, 0), z_dir=(0, 1, 0))):
        with Locations(Location((144.38705, -7.956038969, 0), (0, 0, 270))):
            Circle(SKETCH70_R)
        with Locations(Location((144.38705, -27.956038969, 0), (0, 0, 270))):
            Circle(SKETCH70_R)
        with Locations(Location((144.38705, -47.956038969, 0), (0, 0, 270))):
            Circle(SKETCH70_R)
        with Locations(Location((144.38705, -131.751067812, 0), (0, 0, 270))):
            Circle(SKETCH70_R)
        with Locations(Location((144.38705, -151.751067812, 0), (0, 0, 270))):
            Circle(SKETCH70_R)
        with Locations(Location((144.38705, -171.751067812, 0), (0, 0, 270))):
            Circle(SKETCH70_R)
        with Locations(Location((10.61295, -171.751067812, 0), (0, 0, 270))):
            Circle(SKETCH70_R)
        with Locations(Location((10.61295, -151.751067812, 0), (0, 0, 270))):
            Circle(SKETCH70_R)
        with Locations(Location((10.61295, -131.751067812, 0), (0, 0, 270))):
            Circle(SKETCH70_R)
        with Locations(Location((10.61295, -7.956038969, 0), (0, 0, 270))):
            Circle(SKETCH70_R)
        with Locations(Location((10.61295, -27.956038969, 0), (0, 0, 270))):
            Circle(SKETCH70_R)
        with Locations(Location((10.61295, -47.956038969, 0), (0, 0, 270))):
            Circle(SKETCH70_R)
    extrude(amount=-CUT_EXTRUDE15_DEPTH, mode=Mode.SUBTRACT)

    # Sketch75 → Cut-Extrude16 (cut)
    with BuildSketch(Plane.XY.offset(187.571067812)):
        with Locations((77.5, 24.187428233)):
            Circle(SKETCH75_R)
    extrude(amount=-CUT_EXTRUDE16_DEPTH, mode=Mode.SUBTRACT)

    # Sketch76 → Cut-Extrude17 (cut)
    with BuildSketch(Plane(origin=(0, 0, 187.071067812), x_dir=(-1, 0, 0), z_dir=(0, 0, -1))):
        with Locations(Location((-88, 36.687428233, 0), (0, 0, 90))):
            Circle(SKETCH76_R)
        with Locations(Location((-88, 24.187428233, 0), (0, 0, 90))):
            Circle(SKETCH76_R)
        with Locations(Location((-67, 36.687428233, 0), (0, 0, 90))):
            Circle(SKETCH76_R)
        with Locations(Location((-67, 24.187428233, 0), (0, 0, 90))):
            Circle(SKETCH76_R)
    extrude(amount=-CUT_EXTRUDE17_DEPTH, mode=Mode.SUBTRACT)

    # Sketch77 → Cut-Extrude18 (cut)
    with BuildSketch(Plane.XY.offset(187.571067812)):
        with Locations((27.5, 36.75)):
            Circle(SKETCH77_R)
        with Locations((127.5, 36.75)):
            Circle(SKETCH77_R)
    extrude(amount=-CUT_EXTRUDE18_DEPTH, mode=Mode.SUBTRACT)

    # Sketch78 → Cut-Extrude23 (cut)
    with BuildSketch(Plane.XY.offset(-7.863961031).offset(CUT_EXTRUDE23_START)):
        with Locations((27.5, 36.75)):
            Circle(SKETCH78_R)
        with Locations((127.5, 36.75)):
            Circle(SKETCH78_R)
    extrude(amount=-CUT_EXTRUDE23_DEPTH, mode=Mode.SUBTRACT)

    # Sketch79 → Cut-Extrude24 (cut)
    with BuildSketch(Plane(origin=(155.5, 0, 0), x_dir=(0, 0, -1), z_dir=(1, 0, 0))):
        with Locations(Location((-89.967923987, 36.881858425, 0), (0, 0, 90))):
            Circle(SKETCH79_R)
    extrude(amount=-CUT_EXTRUDE24_DEPTH, mode=Mode.SUBTRACT)

    # Sketch80 → Cut-Extrude25 (cut)
    with BuildSketch(Plane.ZY.offset(0.5).offset(CUT_EXTRUDE25_START)):
        with Locations(Location((89.967923987, 36.881858425, 0), (0, 0, 90))):
            Circle(SKETCH80_R)
    extrude(amount=CUT_EXTRUDE25_DEPTH, mode=Mode.SUBTRACT)

    # Sketch81 → Cut-Extrude26 (cut)
    with BuildSketch(Plane(origin=(155.5, 0, 0), x_dir=(0, 0, -1), z_dir=(1, 0, 0))):
        with Locations(Location((-99.967923987, 36.881858425, 0), (0, 0, 90))):
            Circle(SKETCH81_R)
        with Locations(Location((-79.967923987, 36.881858425, 0), (0, 0, 90))):
            Circle(SKETCH81_R)
    extrude(amount=-CUT_EXTRUDE26_DEPTH, mode=Mode.SUBTRACT)

    # Sketch83 → Cut-Extrude28 (cut)
    with BuildSketch(Plane.ZY.offset(0.5)):
        with Locations(Location((79.997923987, 36.881858425, 0), (0, 0, 270))):
            Circle(SKETCH83_R)
        with Locations(Location((99.997923987, 36.881858425, 0), (0, 0, 270))):
            Circle(SKETCH83_R)
    extrude(amount=-CUT_EXTRUDE28_DEPTH, mode=Mode.SUBTRACT)

    # Sketch84 → Cut-Extrude29 (cut)
    with BuildSketch(Plane.XY.offset(187.571067812)):
        with Locations((17.5, 36.75)):
            Circle(SKETCH84_R)
        with Locations((37.5, 36.75)):
            Circle(SKETCH84_R)
        with Locations((117.5, 36.75)):
            Circle(SKETCH84_R)
        with Locations((137.5, 36.75)):
            Circle(SKETCH84_R)
    extrude(amount=-CUT_EXTRUDE29_DEPTH, mode=Mode.SUBTRACT)

    # Sketch85 → Cut-Extrude30 (cut)
    with BuildSketch(Plane(origin=(0, 0, -7.863961031), x_dir=(-1, 0, 0), z_dir=(0, 0, -1)).offset(CUT_EXTRUDE30_START)):
        with Locations(Location((-137.5, 36.75, 0), (0, 0, 180))):
            Circle(SKETCH85_R)
        with Locations(Location((-117.5, 36.75, 0), (0, 0, 180))):
            Circle(SKETCH85_R)
        with Locations(Location((-37.5, 36.75, 0), (0, 0, 180))):
            Circle(SKETCH85_R)
        with Locations(Location((-17.5, 36.75, 0), (0, 0, 180))):
            Circle(SKETCH85_R)
    extrude(amount=CUT_EXTRUDE30_DEPTH, mode=Mode.SUBTRACT)

    # Sketch88 → Cut-Extrude31 (cut)
    with BuildSketch(Plane.XY.offset(187.571067812)):
        with Locations((55.5, 21)):
            Circle(SKETCH88_R)
        with Locations((99.5, 21)):
            Circle(SKETCH88_R)
    extrude(amount=-CUT_EXTRUDE31_DEPTH, mode=Mode.SUBTRACT)


solid = part.part
